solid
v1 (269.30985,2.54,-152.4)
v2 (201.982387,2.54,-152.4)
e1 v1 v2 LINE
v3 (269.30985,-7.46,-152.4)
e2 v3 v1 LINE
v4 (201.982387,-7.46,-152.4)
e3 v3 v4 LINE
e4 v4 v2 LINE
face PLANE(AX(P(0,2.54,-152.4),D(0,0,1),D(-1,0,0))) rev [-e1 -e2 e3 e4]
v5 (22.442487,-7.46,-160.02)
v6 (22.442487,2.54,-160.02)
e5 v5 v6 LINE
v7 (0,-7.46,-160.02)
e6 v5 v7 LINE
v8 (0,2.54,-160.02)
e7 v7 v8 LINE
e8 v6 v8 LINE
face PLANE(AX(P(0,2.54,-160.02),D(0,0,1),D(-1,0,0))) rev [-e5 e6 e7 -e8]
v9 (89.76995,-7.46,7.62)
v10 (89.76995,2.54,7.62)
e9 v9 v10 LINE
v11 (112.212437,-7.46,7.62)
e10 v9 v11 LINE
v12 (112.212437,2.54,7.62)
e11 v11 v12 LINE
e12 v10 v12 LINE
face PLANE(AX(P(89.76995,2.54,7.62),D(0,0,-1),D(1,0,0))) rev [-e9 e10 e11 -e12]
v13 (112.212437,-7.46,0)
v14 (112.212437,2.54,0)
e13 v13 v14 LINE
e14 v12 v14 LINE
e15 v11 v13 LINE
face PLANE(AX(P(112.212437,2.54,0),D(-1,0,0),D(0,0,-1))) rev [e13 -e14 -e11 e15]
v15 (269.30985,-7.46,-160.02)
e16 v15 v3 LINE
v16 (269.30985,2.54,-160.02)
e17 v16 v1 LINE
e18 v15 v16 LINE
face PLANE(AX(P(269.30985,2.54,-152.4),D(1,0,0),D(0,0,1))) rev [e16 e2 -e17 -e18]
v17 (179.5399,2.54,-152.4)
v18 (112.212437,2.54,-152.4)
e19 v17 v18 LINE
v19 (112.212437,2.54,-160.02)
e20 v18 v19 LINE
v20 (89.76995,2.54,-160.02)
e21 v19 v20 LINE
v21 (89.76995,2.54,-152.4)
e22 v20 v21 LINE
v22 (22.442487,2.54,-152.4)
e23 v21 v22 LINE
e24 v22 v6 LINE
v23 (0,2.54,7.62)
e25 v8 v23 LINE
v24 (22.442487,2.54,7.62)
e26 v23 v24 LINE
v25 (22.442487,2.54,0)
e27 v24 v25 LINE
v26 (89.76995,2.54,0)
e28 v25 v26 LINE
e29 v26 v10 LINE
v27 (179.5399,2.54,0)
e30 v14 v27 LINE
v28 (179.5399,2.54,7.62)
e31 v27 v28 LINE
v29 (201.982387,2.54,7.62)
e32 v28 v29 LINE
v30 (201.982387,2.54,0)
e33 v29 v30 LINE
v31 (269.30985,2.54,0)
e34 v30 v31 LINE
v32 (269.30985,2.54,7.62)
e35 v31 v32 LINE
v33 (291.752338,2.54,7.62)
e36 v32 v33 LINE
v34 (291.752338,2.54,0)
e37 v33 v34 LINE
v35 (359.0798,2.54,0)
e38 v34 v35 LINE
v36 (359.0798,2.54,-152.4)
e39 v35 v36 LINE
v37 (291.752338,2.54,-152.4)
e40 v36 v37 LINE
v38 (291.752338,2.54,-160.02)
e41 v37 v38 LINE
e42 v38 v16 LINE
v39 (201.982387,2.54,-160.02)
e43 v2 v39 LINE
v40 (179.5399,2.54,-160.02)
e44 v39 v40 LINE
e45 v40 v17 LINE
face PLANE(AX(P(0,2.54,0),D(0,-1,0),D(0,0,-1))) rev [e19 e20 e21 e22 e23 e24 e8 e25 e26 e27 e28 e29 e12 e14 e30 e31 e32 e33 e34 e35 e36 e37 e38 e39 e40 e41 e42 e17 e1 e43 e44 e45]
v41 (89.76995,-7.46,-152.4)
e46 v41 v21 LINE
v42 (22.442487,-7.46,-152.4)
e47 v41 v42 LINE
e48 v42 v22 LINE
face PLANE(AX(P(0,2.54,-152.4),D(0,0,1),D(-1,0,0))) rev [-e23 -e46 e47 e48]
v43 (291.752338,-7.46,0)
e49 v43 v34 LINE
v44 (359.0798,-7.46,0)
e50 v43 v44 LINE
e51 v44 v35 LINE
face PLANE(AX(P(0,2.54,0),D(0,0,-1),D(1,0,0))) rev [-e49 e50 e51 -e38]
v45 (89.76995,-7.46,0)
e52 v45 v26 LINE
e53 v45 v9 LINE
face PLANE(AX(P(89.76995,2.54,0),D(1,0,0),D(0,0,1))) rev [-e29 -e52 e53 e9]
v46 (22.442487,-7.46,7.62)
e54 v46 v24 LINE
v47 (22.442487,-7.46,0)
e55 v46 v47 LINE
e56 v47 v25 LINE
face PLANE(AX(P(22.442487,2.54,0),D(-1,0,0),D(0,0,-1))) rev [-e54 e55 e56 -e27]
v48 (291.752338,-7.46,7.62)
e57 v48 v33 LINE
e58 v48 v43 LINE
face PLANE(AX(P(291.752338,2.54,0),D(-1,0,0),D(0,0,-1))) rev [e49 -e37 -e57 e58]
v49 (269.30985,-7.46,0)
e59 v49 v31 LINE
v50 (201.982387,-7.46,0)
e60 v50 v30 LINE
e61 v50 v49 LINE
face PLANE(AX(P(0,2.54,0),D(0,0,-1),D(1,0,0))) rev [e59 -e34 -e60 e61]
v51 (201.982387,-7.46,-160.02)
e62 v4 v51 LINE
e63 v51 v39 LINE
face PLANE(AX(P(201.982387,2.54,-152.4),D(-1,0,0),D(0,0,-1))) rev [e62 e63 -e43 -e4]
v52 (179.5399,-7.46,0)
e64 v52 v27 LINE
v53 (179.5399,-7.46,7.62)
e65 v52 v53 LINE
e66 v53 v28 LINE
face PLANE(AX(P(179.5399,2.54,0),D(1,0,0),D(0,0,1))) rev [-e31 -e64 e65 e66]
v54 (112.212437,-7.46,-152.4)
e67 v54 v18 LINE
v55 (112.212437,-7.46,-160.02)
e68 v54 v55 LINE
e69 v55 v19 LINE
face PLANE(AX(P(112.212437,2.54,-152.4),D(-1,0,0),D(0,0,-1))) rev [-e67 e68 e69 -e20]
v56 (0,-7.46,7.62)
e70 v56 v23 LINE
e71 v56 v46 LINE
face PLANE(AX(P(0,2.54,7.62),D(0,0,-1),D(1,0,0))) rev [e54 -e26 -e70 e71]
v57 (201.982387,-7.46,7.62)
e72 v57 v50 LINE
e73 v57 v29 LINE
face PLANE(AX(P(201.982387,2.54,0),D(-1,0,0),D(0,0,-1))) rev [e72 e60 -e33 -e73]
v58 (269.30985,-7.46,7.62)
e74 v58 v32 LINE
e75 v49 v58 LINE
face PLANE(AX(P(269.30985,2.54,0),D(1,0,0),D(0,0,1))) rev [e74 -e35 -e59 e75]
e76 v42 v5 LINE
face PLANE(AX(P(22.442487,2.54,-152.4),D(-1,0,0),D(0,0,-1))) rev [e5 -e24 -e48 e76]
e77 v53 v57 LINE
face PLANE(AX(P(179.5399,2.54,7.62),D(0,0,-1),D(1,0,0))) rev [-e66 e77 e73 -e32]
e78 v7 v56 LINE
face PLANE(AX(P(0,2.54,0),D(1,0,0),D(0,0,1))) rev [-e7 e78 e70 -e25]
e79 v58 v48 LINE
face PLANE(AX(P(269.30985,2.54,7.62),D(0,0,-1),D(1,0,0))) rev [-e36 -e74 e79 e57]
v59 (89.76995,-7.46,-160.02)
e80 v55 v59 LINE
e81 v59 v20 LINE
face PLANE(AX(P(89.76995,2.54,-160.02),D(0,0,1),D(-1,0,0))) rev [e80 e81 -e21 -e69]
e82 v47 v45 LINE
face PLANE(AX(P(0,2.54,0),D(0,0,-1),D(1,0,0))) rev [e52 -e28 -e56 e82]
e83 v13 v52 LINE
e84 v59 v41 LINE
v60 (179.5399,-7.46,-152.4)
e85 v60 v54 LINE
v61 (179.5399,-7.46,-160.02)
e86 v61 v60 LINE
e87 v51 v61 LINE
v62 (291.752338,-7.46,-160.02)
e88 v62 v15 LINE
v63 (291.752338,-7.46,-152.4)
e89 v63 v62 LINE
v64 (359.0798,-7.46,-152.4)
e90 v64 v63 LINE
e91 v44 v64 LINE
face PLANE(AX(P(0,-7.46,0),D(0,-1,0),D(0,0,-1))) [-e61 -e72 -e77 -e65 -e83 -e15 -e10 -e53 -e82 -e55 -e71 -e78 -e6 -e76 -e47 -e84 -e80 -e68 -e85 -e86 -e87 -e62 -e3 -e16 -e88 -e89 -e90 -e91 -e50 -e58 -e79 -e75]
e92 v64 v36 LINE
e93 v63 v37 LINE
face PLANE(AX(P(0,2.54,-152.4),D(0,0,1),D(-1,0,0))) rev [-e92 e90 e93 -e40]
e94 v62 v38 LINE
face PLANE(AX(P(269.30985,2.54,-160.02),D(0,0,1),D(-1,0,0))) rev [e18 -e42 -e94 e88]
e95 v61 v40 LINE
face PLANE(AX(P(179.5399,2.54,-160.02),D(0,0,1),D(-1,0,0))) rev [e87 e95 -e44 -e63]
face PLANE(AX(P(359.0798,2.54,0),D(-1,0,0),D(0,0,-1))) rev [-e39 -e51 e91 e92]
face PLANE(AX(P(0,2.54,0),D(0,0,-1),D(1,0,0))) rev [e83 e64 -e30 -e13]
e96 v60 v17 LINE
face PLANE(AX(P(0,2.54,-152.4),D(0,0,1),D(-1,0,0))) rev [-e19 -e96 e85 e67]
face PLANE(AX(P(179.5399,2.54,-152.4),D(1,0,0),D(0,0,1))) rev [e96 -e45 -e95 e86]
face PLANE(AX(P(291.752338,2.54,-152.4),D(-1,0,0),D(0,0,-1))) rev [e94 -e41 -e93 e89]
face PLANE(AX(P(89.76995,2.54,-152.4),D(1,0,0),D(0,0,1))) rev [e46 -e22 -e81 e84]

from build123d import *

# Parameters (mm, degrees)
SKETCH1_W                  = 359.0798
SKETCH1_H                  = 152.4
BOSS_EXTRUDE1_DEPTH        = 2.54
SKETCH2_W                  = 22.4424875
SKETCH2_H                  = 7.62
BOSS_EXTRUDE2_DEPTH        = 2.54
CONVERT_SOLID1_OUTLINE_W   = 7.46
CONVERT_SOLID1_OUTLINE_H   = 152.4
CONVERT_SOLID1_DEPTH       = 359.0798
CONVERT_SOLID1_2_OUTLINE_W = 7.46
CONVERT_SOLID1_2_OUTLINE_H = 7.62
CONVERT_SOLID1_2_DEPTH     = 22.4424875
CONVERT_SOLID1_START       = 89.76995
CONVERT_SOLID1_3_OUTLINE_W = 7.46
CONVERT_SOLID1_3_OUTLINE_H = 7.62
CONVERT_SOLID1_3_DEPTH     = 22.4424875
CONVERT_SOLID1_START_2     = 179.5399
CONVERT_SOLID1_4_OUTLINE_W = 7.46
CONVERT_SOLID1_4_OUTLINE_H = 7.62
CONVERT_SOLID1_4_DEPTH     = 22.4424875
CONVERT_SOLID1_START_3     = 269.30985
CONVERT_SOLID1_5_OUTLINE_W = 7.46
CONVERT_SOLID1_5_OUTLINE_H = 7.62
CONVERT_SOLID1_5_DEPTH     = 22.4424875


# Read off the part's stored shape, not the designer's step: Convert-Solid1
with BuildPart() as part:
    # Sketch1 → Boss-Extrude1 (new body)
    with BuildSketch(Plane(origin=(0, 0, 0), x_dir=(1, 0, 0), z_dir=(0, 1, 0))):
        with Locations((179.5399, 76.2)):
            Rectangle(SKETCH1_W, SKETCH1_H)
    extrude(amount=BOSS_EXTRUDE1_DEPTH)

    # Sketch2 → Boss-Extrude2 (add)
    with BuildSketch(Plane(origin=(0, 2.54, 0), x_dir=(1, 0, 0), z_dir=(0, 1, 0))):
        with Locations((11.22124375, 156.21)):
            Rectangle(SKETCH2_W, SKETCH2_H)
        with Locations((100.99119375, 156.21)):
            Rectangle(SKETCH2_W, SKETCH2_H)
        with Locations((190.76114375, 156.21)):
            Rectangle(SKETCH2_W, SKETCH2_H)
        with Locations((280.53109375, 156.21)):
            Rectangle(SKETCH2_W, SKETCH2_H)
        with Locations((11.22124375, -3.81)):
            Rectangle(SKETCH2_W, SKETCH2_H)
        with Locations((100.99119375, -3.81)):
            Rectangle(SKETCH2_W, SKETCH2_H)
        with Locations((190.76114375, -3.81)):
            Rectangle(SKETCH2_W, SKETCH2_H)
        with Locations((280.53109375, -3.81)):
            Rectangle(SKETCH2_W, SKETCH2_H)
    extrude(amount=-BOSS_EXTRUDE2_DEPTH)

    # Convert-Solid1 outline → Convert-Solid1 (add)
    with BuildSketch(Plane.YZ):
        with Locations((-3.73, -76.2)):
            Rectangle(CONVERT_SOLID1_OUTLINE_W, CONVERT_SOLID1_OUTLINE_H)
    extrude(amount=CONVERT_SOLID1_DEPTH)

    # Convert-Solid1 2 outline → Convert-Solid1 2 (add)
    with BuildSketch(Plane.YZ):
        with Locations((-3.73, 3.81)):
            Rectangle(CONVERT_SOLID1_2_OUTLINE_W, CONVERT_SOLID1_2_OUTLINE_H)
        with Locations((-3.73, -156.21)):
            Rectangle(CONVERT_SOLID1_2_OUTLINE_W, CONVERT_SOLID1_2_OUTLINE_H)
    extrude(amount=CONVERT_SOLID1_2_DEPTH)

    # Convert-Solid1 3 outline → Convert-Solid1 3 (add)
    with BuildSketch(Plane.YZ.offset(CONVERT_SOLID1_START)):
        with Locations((-3.73, 3.81)):
            Rectangle(CONVERT_SOLID1_3_OUTLINE_W, CONVERT_SOLID1_3_OUTLINE_H)
        with Locations((-3.73, -156.21)):
            Rectangle(CONVERT_SOLID1_3_OUTLINE_W, CONVERT_SOLID1_3_OUTLINE_H)
    extrude(amount=CONVERT_SOLID1_3_DEPTH)

    # Convert-Solid1 4 outline → Convert-Solid1 4 (add)
    with BuildSketch(Plane.YZ.offset(CONVERT_SOLID1_START_2)):
        with Locations((-3.73, 3.81)):
            Rectangle(CONVERT_SOLID1_4_OUTLINE_W, CONVERT_SOLID1_4_OUTLINE_H)
        with Locations((-3.73, -156.21)):
            Rectangle(CONVERT_SOLID1_4_OUTLINE_W, CONVERT_SOLID1_4_OUTLINE_H)
    extrude(amount=CONVERT_SOLID1_4_DEPTH)

    # Convert-Solid1 5 outline → Convert-Solid1 5 (add)
    with BuildSketch(Plane.YZ.offset(CONVERT_SOLID1_START_3)):
        with Locations((-3.73, 3.81)):
            Rectangle(CONVERT_SOLID1_5_OUTLINE_W, CONVERT_SOLID1_5_OUTLINE_H)
        with Locations((-3.73, -156.21)):
            Rectangle(CONVERT_SOLID1_5_OUTLINE_W, CONVERT_SOLID1_5_OUTLINE_H)
    extrude(amount=CONVERT_SOLID1_5_DEPTH)


solid = part.part
